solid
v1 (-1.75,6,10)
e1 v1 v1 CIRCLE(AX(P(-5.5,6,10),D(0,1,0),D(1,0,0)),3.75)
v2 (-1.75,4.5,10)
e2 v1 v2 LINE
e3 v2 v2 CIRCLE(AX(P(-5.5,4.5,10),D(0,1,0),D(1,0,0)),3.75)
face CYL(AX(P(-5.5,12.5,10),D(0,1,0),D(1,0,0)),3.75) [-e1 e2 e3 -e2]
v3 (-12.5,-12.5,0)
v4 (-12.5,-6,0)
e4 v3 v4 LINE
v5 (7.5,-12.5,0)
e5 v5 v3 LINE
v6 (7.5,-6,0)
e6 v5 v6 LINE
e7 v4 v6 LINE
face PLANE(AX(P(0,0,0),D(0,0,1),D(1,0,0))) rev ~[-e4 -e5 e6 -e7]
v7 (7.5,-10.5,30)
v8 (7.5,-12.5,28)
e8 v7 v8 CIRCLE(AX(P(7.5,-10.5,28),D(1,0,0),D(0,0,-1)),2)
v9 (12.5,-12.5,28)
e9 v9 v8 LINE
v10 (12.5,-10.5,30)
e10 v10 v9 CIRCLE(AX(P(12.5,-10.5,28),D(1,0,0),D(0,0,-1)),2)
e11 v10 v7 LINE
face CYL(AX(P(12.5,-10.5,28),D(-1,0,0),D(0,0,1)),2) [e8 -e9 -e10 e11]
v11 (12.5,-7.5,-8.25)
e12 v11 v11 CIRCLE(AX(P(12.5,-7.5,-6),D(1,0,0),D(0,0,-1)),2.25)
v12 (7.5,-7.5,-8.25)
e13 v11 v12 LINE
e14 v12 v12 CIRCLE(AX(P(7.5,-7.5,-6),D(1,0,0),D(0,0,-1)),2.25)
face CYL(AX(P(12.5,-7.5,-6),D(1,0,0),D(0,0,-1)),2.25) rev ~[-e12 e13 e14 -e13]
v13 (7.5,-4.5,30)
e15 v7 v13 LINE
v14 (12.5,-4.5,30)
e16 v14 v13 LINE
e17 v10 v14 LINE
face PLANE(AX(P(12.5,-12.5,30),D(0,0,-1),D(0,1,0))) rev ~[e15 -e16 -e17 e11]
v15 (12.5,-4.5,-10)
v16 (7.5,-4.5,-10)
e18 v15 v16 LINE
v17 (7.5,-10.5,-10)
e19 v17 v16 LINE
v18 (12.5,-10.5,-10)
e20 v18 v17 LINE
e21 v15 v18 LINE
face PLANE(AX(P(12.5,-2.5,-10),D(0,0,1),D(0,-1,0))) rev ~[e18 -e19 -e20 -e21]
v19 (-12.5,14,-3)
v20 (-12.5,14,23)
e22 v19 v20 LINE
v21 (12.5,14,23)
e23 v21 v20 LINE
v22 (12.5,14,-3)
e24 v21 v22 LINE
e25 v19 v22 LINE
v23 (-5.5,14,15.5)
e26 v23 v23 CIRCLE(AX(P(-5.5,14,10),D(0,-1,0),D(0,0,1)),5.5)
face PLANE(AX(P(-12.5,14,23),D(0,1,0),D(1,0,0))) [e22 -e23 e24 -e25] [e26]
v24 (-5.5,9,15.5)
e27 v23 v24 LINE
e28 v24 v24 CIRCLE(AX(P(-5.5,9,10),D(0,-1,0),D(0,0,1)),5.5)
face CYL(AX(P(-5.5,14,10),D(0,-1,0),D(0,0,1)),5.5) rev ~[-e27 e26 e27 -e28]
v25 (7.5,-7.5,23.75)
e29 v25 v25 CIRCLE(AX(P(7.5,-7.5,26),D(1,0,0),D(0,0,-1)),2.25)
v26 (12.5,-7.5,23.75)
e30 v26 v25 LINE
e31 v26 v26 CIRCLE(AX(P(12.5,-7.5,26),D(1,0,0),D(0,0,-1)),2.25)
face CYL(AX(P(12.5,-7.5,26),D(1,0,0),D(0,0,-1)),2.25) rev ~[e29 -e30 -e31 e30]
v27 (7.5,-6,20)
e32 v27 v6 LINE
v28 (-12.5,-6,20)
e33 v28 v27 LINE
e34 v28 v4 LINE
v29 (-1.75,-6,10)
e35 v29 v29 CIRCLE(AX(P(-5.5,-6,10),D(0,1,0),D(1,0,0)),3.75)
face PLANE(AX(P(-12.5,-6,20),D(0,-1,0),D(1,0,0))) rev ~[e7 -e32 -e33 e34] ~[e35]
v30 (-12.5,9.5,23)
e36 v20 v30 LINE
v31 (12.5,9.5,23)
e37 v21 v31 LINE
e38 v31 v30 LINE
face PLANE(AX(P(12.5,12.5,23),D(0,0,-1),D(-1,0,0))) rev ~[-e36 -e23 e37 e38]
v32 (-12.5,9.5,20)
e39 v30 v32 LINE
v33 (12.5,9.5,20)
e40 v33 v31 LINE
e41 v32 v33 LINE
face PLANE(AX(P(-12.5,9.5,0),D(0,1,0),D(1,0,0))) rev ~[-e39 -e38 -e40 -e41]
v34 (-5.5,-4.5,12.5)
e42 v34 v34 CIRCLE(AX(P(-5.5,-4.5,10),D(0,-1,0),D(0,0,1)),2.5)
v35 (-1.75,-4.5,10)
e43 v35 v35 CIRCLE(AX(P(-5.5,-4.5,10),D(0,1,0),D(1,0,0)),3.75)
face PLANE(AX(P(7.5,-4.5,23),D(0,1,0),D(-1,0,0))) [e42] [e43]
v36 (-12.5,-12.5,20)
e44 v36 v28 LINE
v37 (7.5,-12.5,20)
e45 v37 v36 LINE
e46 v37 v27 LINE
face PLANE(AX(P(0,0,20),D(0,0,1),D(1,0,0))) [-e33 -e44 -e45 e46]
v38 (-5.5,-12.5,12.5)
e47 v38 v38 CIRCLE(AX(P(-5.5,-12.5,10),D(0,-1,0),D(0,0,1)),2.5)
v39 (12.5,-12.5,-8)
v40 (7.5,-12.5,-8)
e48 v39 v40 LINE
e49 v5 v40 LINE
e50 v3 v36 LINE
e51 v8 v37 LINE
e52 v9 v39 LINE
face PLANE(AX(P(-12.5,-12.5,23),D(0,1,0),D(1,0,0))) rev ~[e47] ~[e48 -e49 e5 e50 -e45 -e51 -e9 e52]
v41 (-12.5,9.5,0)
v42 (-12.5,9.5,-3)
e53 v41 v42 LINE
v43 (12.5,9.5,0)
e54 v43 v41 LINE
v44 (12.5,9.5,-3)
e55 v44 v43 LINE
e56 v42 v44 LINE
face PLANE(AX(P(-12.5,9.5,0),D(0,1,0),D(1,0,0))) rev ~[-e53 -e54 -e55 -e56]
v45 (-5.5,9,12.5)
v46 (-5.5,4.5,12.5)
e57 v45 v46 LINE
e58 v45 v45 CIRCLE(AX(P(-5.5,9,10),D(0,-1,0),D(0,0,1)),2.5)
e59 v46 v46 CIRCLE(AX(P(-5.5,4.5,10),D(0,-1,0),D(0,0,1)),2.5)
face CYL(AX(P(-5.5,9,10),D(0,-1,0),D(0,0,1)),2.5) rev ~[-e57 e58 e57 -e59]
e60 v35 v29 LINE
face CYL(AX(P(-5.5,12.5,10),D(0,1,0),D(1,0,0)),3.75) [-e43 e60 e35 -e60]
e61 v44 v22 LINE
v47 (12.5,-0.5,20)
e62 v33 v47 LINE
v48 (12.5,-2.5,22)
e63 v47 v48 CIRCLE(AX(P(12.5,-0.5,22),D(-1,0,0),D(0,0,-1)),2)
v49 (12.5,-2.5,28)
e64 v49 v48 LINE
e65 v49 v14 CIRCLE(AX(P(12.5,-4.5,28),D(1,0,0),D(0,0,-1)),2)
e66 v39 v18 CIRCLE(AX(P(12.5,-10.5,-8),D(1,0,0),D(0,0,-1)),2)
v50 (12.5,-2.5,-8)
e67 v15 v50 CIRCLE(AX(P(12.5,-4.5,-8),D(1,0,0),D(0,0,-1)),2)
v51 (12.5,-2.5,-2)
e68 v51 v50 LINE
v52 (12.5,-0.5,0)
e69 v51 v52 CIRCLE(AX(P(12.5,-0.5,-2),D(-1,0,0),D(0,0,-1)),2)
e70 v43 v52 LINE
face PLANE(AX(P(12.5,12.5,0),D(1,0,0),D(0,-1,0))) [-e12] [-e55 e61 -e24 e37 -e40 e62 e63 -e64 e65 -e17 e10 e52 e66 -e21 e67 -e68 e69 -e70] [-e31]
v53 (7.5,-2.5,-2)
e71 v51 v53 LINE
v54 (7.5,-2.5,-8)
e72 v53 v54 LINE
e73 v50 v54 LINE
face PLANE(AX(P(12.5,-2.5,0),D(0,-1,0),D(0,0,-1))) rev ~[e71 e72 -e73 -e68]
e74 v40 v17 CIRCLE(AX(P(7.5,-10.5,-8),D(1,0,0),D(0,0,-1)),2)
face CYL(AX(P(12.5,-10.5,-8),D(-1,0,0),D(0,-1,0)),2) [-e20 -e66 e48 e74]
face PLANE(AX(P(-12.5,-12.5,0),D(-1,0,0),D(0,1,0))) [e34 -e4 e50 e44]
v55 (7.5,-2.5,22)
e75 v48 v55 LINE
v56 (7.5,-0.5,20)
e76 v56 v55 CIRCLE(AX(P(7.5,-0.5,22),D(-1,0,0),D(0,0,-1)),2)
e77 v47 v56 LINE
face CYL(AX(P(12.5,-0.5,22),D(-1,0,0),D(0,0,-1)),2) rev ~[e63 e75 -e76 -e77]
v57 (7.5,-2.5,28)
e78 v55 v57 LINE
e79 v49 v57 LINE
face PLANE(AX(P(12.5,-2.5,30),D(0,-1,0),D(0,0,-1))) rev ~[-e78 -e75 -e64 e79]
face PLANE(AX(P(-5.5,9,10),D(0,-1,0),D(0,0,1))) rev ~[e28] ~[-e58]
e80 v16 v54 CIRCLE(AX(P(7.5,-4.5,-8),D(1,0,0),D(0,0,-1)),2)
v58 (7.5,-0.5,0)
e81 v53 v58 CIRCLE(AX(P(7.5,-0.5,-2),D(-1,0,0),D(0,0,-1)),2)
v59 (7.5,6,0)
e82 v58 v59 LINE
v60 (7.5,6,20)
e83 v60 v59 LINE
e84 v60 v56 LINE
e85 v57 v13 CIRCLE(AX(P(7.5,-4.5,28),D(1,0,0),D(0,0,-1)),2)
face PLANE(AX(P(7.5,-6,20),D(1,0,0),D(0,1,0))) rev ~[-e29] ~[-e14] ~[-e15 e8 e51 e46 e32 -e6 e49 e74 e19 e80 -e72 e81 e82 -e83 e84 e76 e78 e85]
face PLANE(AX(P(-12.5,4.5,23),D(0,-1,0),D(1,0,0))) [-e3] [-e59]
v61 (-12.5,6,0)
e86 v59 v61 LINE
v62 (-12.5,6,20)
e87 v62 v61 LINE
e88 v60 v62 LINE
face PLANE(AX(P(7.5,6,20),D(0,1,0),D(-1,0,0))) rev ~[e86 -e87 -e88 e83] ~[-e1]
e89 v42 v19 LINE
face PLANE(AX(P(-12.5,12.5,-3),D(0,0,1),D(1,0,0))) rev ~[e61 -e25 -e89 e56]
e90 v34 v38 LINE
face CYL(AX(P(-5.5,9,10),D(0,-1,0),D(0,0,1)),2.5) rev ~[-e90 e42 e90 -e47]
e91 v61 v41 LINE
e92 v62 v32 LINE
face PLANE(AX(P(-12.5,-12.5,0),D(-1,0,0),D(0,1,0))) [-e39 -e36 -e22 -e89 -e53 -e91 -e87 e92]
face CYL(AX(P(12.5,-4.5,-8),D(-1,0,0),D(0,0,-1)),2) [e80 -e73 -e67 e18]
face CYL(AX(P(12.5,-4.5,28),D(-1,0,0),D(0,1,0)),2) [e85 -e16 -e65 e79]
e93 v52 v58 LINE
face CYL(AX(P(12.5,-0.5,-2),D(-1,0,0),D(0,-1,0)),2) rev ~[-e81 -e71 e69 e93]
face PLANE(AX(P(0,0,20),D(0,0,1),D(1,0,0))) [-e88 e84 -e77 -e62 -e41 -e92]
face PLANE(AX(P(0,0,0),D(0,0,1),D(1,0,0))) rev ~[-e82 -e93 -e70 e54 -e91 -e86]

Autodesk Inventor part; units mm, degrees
ref_plane "YZ Plane" through (0, 0, 0) normal (1, 0, 0) x (0, 1, 0)
ref_plane "XZ Plane" through (0, 0, 0) normal (0, 1, 0) x (-1, 0, 0)
ref_plane "XY Plane" through (0, 0, 0) normal (0, 0, 1) x (1, 0, 0)
sketch "Sketch1" plane through (0, 0, 0) normal (0, 0, 1) x (1, 0, 0)
  line L0 (-12.5, 12.5) -> (12.5, 12.5)
  line L1 (12.5, 12.5) -> (12.5, -12.5)
  line L2 (12.5, -12.5) -> (-12.5, -12.5)
  line L3 (-12.5, -12.5) -> (-12.5, 12.5)
  point P0 (0, 0)
  point P1 (-12.5, 0)
  point P2 (0, 12.5)
  dimension "d0" = 25
  dimension "d1" = 25
extrude "Extrusion1" add sketch "Sketch1" along normal blind 20
sketch "Sketch2" plane through (0, 0, 20) normal (0, 0, 1) x (1, 0, 0)
  line L0 (-12.5, -6) -> (7.5, -6)
  line L1 (7.5, -6) -> (7.5, 6)
  line L2 (7.5, 6) -> (-12.5, 6)
  line L3 (-12.5, 6) -> (-12.5, -6)
  line L4 (-12.5, 12.5) -> (-12.5, -12.5) projected
  line L5 (12.5, -12.5) -> (12.5, 12.5) projected
  point P0 (0, 0)
  point P1 (7.5, 0)
  point P2 (12.5, 0)
  dimension "d4" = 12
  dimension "d5" = 5
extrude "Extrusion2" cut sketch "Sketch2" against normal through all
sketch "Sketch3" plane through (-12.5, -12.5, 0) normal (0, -1, 0) x (1, 0, 0)
  line L0 (0, 0) -> (0, 20) projected
  point P0 (12.5, 0)
  point P1 (7, 10)
  point P2 (0, 10)
  dimension "d8" = 7
hole "Hole1" at (-5.5, -12.5, 10) direction (0, 1, 0) diameter 5 end through all
sketch "Sketch4" plane through (-12.5, 12.5, 0) normal (0, 1, 0) x (1, 0, 0)
  line L0 (25, -23) -> (0, -23)
  line L1 (0, -23) -> (0, -20)
  line L2 (0, -20) -> (25, -20)
  line L3 (25, -20) -> (25, -23)
  line L4 (25, -20) -> (0, -20) projected
  line L5 (0, 0) -> (0, -20) projected
  line L6 (25, 0) -> (25, -20) projected
  line L7 (25, 0) -> (0, 0)
  line L8 (0, 0) -> (0, 3)
  line L9 (0, 3) -> (25, 3)
  line L10 (25, 3) -> (25, 0)
  line L11 (25, 0) -> (0, 0) projected
  point P0 (12.5, 0)
  dimension "d16" = 3
extrude "Extrusion3" add sketch "Sketch4" against normal blind 3 contours L0 L1 L2 L3 | L7 L8 L9 L10
sketch "Sketch7" plane through (12.5, -12.5, 20) normal (1, 0, 0) x (0, 0, -1)
  line L0 (-10, 0) -> (-10, 10)
  line L1 (-10, 10) -> (30, 10)
  line L2 (30, 10) -> (30, 0)
  line L3 (20, 0) -> (0, 0) projected
  line L4 (20, 0) -> (20, 22) projected
  line L5 (0, 0) -> (0, 22) projected
  circle A0 centre (26, 5) radius 2.25
  circle A1 centre (-6, 5) radius 2.25
  line L6 (20, 0) -> (0, 0) projected
  line L7 (-10, 0) -> (32.446, 0)
  point P0 (20, 12.5)
  point P1 (30, 5)
  point P2 (20, 10)
  point P3 (0, 10)
  point P4 (20, 0)
  point P5 (0, 0)
  dimension "d30" = 10
  dimension "d31" = 10
  dimension "d32" = 4.5
  dimension "d33" = 4
  dimension "d34" = 4
  dimension "d50" = 10
  dimension "d51" = 0
extrude "Extrusion5" add sketch "Sketch7" against normal up to surface (5 mm away) contours L0 L1 L5 L7 | L4 L1 L2 L7
sketch "Sketch6" plane through (-12.5, 12.5, 23) normal (0, 1, 0) x (1, 0, 0)
  circle A0 centre (7, 13) radius 2.5 projected
  circle A1 centre (7, 13) radius 1.5
  point P0 (12.5, 23)
  dimension "d26" = 3
extrude "Extrusion4" add sketch "Sketch6" against normal blind 2
sketch "Sketch8" plane through (-12.5, 12.5, 23) normal (0, 1, 0) x (1, 0, 0)
  circle A0 centre (7, 13) radius 1.5 projected
  circle A1 centre (7, 13) radius 3.75
  point P0 (12.5, 23)
  dimension "d37" = 7.5
extrude "Extrusion6" add sketch "Sketch8" against normal up to surface (25 mm away)
sketch "Sketch9" plane through (-12.5, 12.5, 23) normal (0, 0, 1) x (1, 0, 0)
  line L0 (0, -8) -> (20, -8)
  line L1 (20, -8) -> (20, -17)
  line L2 (20, -17) -> (0, -17)
  line L3 (0, -17) -> (0, -8)
  line L4 (0, -18.5) -> (0, -25) projected
  line L5 (20, -6.5) -> (20, -18.5) projected
  line L6 (0, -6.5) -> (20, -6.5) projected
  line L7 (20, -18.5) -> (0, -18.5) projected
  point P0 (12.5, -12.5)
  point P1 (20, -15)
  dimension "d40" = 1.5
  dimension "d41" = 1.5
extrude "Extrusion7" cut sketch "Sketch9" against normal through all
move faces "Move2" translate (0, 1.5, 0) faces at (7, 12.5, 10)
fillet "Fillet2" radius 2 6 edges at (10, -2.5, 20) (10, -2.5, 30) (10, -12.5, 30) (10, -12.5, -10) (10, -2.5, -10) (10, -2.5, 0)
sketch "Sketch11" plane through (-12.5, 14, 23) normal (0, 1, 0) x (1, 0, 0)
  circle A0 centre (7, 13) radius 1.5 projected
  point P0 (12.5, 23)
hole "Hole3" at (-5.5, 14, 10) direction (0, -1, 0) diameter 5 end through all counterbore diameter 11 counterbore depth 5
equation "\"d30\" = d31"
properties part number "10-03-024"
